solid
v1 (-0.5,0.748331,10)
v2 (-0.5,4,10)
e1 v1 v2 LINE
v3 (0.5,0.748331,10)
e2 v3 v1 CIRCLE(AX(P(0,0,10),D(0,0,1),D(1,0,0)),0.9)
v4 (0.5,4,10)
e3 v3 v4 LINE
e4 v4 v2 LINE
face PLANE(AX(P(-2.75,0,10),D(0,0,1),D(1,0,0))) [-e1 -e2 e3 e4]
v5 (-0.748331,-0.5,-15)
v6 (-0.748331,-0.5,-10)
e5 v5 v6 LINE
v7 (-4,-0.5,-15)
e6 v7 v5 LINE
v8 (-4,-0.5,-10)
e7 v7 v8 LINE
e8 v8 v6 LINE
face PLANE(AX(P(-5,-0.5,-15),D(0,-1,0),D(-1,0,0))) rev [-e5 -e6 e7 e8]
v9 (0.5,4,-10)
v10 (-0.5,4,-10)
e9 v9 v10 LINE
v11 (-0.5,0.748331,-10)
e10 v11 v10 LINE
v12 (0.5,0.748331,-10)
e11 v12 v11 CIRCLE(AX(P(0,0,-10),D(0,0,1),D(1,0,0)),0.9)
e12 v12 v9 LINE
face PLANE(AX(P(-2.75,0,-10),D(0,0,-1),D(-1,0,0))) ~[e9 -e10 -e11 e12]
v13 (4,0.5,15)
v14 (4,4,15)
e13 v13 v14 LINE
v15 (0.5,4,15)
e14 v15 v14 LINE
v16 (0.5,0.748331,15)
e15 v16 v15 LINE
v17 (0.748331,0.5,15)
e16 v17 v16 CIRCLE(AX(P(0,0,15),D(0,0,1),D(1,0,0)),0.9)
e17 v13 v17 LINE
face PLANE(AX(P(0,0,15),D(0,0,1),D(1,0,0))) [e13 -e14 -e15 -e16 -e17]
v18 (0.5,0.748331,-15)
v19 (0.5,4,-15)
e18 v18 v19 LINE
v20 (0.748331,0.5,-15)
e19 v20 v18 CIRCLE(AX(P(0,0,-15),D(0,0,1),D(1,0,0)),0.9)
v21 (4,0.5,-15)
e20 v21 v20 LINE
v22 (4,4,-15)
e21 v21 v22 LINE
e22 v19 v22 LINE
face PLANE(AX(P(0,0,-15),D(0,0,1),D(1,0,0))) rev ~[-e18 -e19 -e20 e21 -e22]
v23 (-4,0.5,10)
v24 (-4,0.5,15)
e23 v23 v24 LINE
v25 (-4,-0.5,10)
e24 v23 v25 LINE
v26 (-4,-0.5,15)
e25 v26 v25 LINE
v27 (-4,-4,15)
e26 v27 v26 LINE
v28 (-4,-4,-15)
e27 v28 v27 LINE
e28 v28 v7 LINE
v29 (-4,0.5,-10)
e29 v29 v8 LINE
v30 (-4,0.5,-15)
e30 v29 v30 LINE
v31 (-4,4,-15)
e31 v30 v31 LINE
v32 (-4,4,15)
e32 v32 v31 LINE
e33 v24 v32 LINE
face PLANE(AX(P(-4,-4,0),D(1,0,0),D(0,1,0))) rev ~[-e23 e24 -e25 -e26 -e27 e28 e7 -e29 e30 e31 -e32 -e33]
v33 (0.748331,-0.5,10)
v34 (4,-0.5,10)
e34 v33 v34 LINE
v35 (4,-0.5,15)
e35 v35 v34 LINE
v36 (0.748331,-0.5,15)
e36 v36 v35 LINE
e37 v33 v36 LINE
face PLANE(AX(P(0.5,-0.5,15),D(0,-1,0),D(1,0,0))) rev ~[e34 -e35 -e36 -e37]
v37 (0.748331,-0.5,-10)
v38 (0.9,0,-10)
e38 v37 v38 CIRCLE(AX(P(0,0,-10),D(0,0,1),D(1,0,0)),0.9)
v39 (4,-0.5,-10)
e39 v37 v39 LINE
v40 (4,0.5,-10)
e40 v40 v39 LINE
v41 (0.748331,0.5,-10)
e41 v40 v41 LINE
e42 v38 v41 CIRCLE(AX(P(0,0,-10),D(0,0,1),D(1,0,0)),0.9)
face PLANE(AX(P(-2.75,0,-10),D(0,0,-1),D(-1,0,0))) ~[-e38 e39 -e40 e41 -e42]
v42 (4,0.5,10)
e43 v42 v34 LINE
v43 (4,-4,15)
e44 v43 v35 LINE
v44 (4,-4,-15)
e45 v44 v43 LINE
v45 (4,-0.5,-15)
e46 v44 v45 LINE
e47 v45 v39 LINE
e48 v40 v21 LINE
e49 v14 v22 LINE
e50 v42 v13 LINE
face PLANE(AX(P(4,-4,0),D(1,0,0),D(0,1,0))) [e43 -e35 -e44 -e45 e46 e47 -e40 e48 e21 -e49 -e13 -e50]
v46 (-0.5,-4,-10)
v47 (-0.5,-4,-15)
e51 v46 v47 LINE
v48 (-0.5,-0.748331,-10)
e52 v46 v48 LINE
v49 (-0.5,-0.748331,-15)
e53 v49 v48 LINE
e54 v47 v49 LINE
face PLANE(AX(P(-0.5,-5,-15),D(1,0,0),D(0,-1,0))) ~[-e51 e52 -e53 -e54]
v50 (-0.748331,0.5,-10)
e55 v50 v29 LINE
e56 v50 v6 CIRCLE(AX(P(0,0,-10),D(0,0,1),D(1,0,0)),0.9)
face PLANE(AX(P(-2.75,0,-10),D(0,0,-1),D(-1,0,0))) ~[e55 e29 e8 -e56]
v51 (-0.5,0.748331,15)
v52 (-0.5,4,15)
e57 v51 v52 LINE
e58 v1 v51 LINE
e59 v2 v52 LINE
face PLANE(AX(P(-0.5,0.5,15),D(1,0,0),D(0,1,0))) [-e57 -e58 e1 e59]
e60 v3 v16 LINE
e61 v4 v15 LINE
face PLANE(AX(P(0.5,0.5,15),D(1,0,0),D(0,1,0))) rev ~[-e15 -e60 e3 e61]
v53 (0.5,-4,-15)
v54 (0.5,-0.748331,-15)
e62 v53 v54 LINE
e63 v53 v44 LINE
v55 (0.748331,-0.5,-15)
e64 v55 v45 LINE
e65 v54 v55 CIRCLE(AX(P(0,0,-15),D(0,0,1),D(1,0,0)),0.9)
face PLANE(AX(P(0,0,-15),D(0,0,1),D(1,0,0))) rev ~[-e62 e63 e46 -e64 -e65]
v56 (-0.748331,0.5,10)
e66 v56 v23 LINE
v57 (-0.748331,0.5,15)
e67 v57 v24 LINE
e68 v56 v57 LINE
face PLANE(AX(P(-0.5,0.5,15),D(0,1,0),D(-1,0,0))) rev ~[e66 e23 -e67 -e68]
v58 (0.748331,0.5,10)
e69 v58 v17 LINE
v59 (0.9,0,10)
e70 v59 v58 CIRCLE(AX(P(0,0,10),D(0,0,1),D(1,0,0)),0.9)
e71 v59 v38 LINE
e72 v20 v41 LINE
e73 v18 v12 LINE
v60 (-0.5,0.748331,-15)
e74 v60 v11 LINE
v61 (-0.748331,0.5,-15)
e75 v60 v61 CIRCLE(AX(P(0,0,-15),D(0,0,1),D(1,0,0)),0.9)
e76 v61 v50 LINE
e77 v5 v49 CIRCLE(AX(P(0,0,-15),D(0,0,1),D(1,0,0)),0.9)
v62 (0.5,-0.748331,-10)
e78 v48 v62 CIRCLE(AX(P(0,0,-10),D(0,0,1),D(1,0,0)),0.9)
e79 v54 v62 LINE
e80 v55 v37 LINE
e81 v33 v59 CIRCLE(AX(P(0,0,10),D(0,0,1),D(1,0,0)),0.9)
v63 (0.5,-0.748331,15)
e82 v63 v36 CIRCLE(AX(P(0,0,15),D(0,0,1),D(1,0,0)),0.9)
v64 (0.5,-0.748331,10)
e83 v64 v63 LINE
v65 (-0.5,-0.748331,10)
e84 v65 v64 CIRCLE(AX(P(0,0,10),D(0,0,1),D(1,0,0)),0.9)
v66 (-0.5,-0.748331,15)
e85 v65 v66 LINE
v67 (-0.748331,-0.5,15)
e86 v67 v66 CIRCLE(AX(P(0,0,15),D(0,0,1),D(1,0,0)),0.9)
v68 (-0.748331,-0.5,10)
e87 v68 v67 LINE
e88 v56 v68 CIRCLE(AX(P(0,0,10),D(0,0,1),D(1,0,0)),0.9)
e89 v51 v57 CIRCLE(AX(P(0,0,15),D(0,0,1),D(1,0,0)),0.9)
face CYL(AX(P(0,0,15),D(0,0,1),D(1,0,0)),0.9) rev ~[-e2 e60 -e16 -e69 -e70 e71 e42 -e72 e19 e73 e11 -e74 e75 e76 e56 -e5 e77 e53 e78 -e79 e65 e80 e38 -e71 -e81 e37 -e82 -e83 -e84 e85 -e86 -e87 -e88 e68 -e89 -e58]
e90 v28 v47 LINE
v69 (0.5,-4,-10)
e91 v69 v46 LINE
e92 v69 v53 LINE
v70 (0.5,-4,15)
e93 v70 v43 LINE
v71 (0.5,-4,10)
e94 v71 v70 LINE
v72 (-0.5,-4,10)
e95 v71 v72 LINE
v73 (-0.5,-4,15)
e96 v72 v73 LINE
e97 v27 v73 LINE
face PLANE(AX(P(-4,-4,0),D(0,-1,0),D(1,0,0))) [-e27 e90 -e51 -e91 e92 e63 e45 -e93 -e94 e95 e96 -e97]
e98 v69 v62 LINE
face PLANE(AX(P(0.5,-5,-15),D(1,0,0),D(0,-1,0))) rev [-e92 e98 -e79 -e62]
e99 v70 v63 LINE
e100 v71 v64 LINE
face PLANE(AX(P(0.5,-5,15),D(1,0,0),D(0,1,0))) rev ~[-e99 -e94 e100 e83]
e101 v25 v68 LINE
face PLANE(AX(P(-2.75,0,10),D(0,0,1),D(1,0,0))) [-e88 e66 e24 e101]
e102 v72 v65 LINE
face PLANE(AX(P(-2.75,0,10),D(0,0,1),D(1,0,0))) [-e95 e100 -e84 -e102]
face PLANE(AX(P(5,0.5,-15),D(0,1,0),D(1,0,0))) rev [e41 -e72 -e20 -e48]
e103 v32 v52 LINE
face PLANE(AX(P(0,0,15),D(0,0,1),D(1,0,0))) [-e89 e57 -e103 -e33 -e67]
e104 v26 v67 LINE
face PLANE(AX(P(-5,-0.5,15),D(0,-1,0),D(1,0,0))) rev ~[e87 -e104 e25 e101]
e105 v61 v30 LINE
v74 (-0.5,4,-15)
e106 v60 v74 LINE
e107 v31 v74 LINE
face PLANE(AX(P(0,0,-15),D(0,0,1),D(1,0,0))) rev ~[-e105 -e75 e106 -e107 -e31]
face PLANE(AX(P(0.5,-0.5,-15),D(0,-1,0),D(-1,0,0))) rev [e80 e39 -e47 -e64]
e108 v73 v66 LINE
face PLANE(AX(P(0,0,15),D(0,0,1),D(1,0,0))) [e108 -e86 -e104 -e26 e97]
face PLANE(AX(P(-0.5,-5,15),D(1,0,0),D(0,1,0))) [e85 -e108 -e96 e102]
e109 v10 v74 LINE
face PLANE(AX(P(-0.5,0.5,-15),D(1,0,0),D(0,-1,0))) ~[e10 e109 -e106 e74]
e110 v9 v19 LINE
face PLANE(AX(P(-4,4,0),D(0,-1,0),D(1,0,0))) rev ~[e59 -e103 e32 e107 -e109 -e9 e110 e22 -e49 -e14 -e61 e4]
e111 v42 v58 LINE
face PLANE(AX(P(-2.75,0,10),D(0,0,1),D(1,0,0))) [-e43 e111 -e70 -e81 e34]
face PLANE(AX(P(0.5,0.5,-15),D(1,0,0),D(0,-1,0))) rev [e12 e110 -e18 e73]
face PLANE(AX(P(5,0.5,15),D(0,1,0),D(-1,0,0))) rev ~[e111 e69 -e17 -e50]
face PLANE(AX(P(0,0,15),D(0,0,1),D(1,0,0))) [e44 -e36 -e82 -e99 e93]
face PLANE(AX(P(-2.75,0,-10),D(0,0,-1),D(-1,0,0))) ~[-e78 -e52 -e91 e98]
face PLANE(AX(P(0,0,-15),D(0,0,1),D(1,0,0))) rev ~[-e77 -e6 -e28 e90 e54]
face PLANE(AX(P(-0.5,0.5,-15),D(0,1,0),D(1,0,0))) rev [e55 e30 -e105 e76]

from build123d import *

# Parameters (mm, degrees)
F0_W          = 8
F0_H          = 8
F1_DEPTH      = 15
F1_DEPTH_BACK = 15
F2_R          = 0.9
F3_DEPTH      = 36.9
F4_W          = 4.5
F4_H          = 1
F4_W_2        = 1
F4_H_2        = 4.5
F5_DEPTH      = 5


# Not quite as in the source:
# - a pattern or mirror of a feature is missing from the dataset's text; its kind, count and spacing are read off the source's solid


with BuildPart() as f1:
    # F0 (on Top) → F1 (new body, two sides)
    with BuildSketch(Plane.XY) as f1_sk:
        Rectangle(F0_W, F0_H)
    extrude(amount=F1_DEPTH)
    extrude(f1_sk.sketch, amount=-F1_DEPTH_BACK)

    # F2 (on face) → F3 (cut)
    with BuildSketch(Plane.XY.offset(15)):
        Circle(F2_R)
    extrude(amount=-F3_DEPTH, mode=Mode.SUBTRACT)

    # F4 (on face) → F5 (cut)
    with BuildSketch(Plane.XY.offset(15)):
        with Locations((-2.75, 0)):
            Rectangle(F4_W, F4_H)
        Rectangle(F4_W_2, F4_H)
        with Locations((0, -2.75)):
            Rectangle(F4_W_2, F4_H_2)
        with Locations((2.75, 0)):
            Rectangle(F4_W, F4_H)
        with Locations((0, 2.75)):
            Rectangle(F4_W_2, F4_H_2)
    f5 = extrude(amount=-F5_DEPTH, mode=Mode.SUBTRACT)

    # F5_copies: F5 across plane
    add(f5.mirror(Plane(origin=(0, 0, 0), x_dir=(-1, 0, 0), z_dir=(0, 0, -1))), mode=Mode.SUBTRACT)


solid = f1.part
